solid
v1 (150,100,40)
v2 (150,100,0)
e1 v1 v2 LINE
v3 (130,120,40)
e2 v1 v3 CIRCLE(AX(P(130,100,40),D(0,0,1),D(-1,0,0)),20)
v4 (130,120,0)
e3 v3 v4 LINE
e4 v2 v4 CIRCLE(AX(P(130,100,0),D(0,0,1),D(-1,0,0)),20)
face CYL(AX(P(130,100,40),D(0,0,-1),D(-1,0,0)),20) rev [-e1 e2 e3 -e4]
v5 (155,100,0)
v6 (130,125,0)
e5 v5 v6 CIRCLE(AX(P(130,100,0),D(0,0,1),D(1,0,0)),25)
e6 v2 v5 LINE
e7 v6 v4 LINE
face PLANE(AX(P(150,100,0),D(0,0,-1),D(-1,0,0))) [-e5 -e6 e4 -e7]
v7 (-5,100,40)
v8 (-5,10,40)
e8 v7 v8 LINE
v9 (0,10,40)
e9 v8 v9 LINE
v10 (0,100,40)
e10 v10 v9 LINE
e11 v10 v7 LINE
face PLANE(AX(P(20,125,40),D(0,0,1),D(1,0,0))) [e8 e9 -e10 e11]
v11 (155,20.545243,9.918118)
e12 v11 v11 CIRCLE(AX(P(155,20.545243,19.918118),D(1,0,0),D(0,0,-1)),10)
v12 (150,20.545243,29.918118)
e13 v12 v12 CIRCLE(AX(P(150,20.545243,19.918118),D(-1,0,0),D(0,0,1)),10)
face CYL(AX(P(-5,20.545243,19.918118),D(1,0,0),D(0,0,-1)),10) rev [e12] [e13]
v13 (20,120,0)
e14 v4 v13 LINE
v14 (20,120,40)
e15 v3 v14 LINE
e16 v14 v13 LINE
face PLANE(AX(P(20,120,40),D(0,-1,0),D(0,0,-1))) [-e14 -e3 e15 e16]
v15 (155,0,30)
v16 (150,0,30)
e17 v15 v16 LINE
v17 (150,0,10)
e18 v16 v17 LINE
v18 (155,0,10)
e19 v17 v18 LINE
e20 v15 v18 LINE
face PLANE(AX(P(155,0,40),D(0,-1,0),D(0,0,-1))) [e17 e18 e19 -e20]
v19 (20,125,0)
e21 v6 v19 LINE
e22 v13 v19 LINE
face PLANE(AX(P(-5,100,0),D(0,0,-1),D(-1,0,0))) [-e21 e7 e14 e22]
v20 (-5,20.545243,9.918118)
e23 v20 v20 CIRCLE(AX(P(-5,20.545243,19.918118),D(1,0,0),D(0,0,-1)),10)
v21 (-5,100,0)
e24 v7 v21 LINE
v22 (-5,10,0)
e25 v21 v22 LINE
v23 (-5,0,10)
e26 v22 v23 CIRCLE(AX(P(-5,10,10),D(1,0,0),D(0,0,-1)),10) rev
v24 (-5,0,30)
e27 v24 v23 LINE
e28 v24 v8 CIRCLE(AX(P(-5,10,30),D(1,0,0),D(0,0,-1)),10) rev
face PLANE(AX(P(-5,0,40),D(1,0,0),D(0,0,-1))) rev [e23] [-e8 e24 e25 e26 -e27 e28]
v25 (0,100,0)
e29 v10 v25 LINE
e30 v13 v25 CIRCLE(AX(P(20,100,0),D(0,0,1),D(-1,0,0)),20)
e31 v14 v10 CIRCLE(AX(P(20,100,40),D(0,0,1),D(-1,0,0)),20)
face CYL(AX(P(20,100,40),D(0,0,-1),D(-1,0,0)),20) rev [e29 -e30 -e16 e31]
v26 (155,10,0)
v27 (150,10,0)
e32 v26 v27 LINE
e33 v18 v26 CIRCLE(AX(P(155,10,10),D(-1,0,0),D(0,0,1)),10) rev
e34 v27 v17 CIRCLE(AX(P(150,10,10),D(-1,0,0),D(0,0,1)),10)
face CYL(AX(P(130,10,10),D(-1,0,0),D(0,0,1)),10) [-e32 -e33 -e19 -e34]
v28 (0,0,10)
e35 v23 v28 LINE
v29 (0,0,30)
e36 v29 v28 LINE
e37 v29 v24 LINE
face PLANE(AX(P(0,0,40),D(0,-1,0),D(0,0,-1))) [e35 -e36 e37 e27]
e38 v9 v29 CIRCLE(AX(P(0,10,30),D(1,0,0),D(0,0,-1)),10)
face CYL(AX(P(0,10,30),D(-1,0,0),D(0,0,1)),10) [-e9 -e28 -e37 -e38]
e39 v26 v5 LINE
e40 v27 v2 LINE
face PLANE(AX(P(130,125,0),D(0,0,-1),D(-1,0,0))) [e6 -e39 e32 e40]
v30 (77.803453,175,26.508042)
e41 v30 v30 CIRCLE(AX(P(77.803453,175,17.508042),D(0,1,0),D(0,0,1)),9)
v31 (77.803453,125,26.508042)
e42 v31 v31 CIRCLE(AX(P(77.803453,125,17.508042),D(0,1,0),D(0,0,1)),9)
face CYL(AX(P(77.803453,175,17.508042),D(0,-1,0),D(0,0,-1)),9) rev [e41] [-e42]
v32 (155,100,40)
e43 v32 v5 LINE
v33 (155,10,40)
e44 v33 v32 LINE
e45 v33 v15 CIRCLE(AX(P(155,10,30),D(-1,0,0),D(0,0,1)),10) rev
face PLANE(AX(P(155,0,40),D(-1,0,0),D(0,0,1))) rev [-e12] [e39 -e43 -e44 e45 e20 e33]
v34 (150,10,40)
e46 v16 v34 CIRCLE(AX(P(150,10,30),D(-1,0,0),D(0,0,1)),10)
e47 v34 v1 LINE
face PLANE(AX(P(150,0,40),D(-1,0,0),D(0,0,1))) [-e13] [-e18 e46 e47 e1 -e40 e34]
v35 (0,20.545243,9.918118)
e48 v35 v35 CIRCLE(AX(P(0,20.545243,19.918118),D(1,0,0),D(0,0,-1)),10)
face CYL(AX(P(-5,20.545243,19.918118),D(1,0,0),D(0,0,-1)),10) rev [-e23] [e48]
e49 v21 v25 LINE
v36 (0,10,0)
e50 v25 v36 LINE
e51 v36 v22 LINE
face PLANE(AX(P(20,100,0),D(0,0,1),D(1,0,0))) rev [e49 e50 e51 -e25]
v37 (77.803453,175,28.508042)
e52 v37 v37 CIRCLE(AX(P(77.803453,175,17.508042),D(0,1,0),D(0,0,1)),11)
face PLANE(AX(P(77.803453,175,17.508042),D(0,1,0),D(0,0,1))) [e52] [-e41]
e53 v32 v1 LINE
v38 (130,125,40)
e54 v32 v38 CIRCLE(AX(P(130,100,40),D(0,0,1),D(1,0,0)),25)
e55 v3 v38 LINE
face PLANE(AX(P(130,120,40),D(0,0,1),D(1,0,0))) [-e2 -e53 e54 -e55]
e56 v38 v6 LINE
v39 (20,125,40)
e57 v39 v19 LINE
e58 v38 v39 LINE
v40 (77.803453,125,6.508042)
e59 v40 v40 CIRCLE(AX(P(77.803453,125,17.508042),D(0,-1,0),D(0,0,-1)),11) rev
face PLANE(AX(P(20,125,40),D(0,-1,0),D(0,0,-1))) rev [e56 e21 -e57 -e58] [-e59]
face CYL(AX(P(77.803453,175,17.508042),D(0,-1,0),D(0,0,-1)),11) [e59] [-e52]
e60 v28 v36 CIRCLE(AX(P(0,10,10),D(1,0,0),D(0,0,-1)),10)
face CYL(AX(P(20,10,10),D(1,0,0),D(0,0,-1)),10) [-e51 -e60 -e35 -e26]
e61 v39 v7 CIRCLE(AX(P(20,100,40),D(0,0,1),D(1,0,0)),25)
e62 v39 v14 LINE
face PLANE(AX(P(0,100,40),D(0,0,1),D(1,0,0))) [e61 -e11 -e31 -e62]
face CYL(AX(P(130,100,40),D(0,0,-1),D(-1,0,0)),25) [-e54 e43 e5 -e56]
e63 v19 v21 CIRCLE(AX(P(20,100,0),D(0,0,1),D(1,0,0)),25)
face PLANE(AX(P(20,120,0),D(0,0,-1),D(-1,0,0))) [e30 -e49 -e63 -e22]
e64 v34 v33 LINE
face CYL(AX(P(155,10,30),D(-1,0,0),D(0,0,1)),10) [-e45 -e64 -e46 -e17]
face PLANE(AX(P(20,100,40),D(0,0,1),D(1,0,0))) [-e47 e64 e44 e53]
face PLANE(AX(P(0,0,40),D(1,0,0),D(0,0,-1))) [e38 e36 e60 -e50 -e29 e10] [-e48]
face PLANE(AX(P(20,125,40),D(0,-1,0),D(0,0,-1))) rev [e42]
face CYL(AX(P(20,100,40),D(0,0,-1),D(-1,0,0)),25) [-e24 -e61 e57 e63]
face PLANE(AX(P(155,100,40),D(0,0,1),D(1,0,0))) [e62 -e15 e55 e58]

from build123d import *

# Parameters (mm, degrees)
BASE_FLANGE1_DEPTH  = 40
FILLET1_R           = 10
SKETCH3_R           = 10
CUT_EXTRUDE1_DEPTH  = 207.942020866
SKETCH4_R           = 11
SKETCH4_R_2         = 9
BOSS_EXTRUDE1_DEPTH = 50


# Sheet-metal steps are written as plain solids
with BuildPart() as part:
    # Sketch1 → Base-Flange1 (new body)
    with BuildSketch(Plane.XY):
        with BuildLine():
            Line((0, 0), (0, 100))
            ThreePointArc((0, 100), (5.857864376, 114.142135624), (20, 120))
            Line((20, 120), (130, 120))
            ThreePointArc((130, 120), (144.142135624, 114.142135624), (150, 100))
            Line((150, 100), (150, 0))
            Line((150, 0), (155, 0))
            Line((155, 0), (155, 100))
            ThreePointArc((155, 100), (147.67766953, 117.67766953), (130, 125))
            Line((130, 125), (20, 125))
            ThreePointArc((20, 125), (2.32233047, 117.67766953), (-5, 100))
            Line((-5, 100), (-5, 0))
            Line((-5, 0), (0, 0))
        make_face()
    extrude(amount=BASE_FLANGE1_DEPTH)

    # Fillet1
    fillet1_edges = [part.edges().sort_by_distance(p)[0] for p in [
        (152.5, 0, 0),
        (-2.5, 0, 0),
        (152.5, 0, 40),
        (-2.5, 0, 40),
    ]]
    fillet(fillet1_edges, radius=FILLET1_R)

    # Sketch3 → Cut-Extrude1 (cut, through all)
    with BuildSketch(Plane(origin=(155, 0, 0), x_dir=(0, 0, -1), z_dir=(1, 0, 0))):
        with Locations((-19.918118103, 20.545243048)):
            Circle(SKETCH3_R)
    extrude(amount=-CUT_EXTRUDE1_DEPTH, mode=Mode.SUBTRACT)

    # Sketch4 → Boss-Extrude1 (add)
    with BuildSketch(Plane(origin=(0, 125, 0), x_dir=(1, 0, 0), z_dir=(0, 1, 0))):
        with Locations(Location((77.803452919, -17.50804185, 0), (0, 0, 90))):
            Circle(SKETCH4_R)
        with Locations(Location((77.803452919, -17.50804185, 0), (0, 0, 270))):
            Circle(SKETCH4_R_2, mode=Mode.SUBTRACT)
    extrude(amount=BOSS_EXTRUDE1_DEPTH)


solid = part.part
